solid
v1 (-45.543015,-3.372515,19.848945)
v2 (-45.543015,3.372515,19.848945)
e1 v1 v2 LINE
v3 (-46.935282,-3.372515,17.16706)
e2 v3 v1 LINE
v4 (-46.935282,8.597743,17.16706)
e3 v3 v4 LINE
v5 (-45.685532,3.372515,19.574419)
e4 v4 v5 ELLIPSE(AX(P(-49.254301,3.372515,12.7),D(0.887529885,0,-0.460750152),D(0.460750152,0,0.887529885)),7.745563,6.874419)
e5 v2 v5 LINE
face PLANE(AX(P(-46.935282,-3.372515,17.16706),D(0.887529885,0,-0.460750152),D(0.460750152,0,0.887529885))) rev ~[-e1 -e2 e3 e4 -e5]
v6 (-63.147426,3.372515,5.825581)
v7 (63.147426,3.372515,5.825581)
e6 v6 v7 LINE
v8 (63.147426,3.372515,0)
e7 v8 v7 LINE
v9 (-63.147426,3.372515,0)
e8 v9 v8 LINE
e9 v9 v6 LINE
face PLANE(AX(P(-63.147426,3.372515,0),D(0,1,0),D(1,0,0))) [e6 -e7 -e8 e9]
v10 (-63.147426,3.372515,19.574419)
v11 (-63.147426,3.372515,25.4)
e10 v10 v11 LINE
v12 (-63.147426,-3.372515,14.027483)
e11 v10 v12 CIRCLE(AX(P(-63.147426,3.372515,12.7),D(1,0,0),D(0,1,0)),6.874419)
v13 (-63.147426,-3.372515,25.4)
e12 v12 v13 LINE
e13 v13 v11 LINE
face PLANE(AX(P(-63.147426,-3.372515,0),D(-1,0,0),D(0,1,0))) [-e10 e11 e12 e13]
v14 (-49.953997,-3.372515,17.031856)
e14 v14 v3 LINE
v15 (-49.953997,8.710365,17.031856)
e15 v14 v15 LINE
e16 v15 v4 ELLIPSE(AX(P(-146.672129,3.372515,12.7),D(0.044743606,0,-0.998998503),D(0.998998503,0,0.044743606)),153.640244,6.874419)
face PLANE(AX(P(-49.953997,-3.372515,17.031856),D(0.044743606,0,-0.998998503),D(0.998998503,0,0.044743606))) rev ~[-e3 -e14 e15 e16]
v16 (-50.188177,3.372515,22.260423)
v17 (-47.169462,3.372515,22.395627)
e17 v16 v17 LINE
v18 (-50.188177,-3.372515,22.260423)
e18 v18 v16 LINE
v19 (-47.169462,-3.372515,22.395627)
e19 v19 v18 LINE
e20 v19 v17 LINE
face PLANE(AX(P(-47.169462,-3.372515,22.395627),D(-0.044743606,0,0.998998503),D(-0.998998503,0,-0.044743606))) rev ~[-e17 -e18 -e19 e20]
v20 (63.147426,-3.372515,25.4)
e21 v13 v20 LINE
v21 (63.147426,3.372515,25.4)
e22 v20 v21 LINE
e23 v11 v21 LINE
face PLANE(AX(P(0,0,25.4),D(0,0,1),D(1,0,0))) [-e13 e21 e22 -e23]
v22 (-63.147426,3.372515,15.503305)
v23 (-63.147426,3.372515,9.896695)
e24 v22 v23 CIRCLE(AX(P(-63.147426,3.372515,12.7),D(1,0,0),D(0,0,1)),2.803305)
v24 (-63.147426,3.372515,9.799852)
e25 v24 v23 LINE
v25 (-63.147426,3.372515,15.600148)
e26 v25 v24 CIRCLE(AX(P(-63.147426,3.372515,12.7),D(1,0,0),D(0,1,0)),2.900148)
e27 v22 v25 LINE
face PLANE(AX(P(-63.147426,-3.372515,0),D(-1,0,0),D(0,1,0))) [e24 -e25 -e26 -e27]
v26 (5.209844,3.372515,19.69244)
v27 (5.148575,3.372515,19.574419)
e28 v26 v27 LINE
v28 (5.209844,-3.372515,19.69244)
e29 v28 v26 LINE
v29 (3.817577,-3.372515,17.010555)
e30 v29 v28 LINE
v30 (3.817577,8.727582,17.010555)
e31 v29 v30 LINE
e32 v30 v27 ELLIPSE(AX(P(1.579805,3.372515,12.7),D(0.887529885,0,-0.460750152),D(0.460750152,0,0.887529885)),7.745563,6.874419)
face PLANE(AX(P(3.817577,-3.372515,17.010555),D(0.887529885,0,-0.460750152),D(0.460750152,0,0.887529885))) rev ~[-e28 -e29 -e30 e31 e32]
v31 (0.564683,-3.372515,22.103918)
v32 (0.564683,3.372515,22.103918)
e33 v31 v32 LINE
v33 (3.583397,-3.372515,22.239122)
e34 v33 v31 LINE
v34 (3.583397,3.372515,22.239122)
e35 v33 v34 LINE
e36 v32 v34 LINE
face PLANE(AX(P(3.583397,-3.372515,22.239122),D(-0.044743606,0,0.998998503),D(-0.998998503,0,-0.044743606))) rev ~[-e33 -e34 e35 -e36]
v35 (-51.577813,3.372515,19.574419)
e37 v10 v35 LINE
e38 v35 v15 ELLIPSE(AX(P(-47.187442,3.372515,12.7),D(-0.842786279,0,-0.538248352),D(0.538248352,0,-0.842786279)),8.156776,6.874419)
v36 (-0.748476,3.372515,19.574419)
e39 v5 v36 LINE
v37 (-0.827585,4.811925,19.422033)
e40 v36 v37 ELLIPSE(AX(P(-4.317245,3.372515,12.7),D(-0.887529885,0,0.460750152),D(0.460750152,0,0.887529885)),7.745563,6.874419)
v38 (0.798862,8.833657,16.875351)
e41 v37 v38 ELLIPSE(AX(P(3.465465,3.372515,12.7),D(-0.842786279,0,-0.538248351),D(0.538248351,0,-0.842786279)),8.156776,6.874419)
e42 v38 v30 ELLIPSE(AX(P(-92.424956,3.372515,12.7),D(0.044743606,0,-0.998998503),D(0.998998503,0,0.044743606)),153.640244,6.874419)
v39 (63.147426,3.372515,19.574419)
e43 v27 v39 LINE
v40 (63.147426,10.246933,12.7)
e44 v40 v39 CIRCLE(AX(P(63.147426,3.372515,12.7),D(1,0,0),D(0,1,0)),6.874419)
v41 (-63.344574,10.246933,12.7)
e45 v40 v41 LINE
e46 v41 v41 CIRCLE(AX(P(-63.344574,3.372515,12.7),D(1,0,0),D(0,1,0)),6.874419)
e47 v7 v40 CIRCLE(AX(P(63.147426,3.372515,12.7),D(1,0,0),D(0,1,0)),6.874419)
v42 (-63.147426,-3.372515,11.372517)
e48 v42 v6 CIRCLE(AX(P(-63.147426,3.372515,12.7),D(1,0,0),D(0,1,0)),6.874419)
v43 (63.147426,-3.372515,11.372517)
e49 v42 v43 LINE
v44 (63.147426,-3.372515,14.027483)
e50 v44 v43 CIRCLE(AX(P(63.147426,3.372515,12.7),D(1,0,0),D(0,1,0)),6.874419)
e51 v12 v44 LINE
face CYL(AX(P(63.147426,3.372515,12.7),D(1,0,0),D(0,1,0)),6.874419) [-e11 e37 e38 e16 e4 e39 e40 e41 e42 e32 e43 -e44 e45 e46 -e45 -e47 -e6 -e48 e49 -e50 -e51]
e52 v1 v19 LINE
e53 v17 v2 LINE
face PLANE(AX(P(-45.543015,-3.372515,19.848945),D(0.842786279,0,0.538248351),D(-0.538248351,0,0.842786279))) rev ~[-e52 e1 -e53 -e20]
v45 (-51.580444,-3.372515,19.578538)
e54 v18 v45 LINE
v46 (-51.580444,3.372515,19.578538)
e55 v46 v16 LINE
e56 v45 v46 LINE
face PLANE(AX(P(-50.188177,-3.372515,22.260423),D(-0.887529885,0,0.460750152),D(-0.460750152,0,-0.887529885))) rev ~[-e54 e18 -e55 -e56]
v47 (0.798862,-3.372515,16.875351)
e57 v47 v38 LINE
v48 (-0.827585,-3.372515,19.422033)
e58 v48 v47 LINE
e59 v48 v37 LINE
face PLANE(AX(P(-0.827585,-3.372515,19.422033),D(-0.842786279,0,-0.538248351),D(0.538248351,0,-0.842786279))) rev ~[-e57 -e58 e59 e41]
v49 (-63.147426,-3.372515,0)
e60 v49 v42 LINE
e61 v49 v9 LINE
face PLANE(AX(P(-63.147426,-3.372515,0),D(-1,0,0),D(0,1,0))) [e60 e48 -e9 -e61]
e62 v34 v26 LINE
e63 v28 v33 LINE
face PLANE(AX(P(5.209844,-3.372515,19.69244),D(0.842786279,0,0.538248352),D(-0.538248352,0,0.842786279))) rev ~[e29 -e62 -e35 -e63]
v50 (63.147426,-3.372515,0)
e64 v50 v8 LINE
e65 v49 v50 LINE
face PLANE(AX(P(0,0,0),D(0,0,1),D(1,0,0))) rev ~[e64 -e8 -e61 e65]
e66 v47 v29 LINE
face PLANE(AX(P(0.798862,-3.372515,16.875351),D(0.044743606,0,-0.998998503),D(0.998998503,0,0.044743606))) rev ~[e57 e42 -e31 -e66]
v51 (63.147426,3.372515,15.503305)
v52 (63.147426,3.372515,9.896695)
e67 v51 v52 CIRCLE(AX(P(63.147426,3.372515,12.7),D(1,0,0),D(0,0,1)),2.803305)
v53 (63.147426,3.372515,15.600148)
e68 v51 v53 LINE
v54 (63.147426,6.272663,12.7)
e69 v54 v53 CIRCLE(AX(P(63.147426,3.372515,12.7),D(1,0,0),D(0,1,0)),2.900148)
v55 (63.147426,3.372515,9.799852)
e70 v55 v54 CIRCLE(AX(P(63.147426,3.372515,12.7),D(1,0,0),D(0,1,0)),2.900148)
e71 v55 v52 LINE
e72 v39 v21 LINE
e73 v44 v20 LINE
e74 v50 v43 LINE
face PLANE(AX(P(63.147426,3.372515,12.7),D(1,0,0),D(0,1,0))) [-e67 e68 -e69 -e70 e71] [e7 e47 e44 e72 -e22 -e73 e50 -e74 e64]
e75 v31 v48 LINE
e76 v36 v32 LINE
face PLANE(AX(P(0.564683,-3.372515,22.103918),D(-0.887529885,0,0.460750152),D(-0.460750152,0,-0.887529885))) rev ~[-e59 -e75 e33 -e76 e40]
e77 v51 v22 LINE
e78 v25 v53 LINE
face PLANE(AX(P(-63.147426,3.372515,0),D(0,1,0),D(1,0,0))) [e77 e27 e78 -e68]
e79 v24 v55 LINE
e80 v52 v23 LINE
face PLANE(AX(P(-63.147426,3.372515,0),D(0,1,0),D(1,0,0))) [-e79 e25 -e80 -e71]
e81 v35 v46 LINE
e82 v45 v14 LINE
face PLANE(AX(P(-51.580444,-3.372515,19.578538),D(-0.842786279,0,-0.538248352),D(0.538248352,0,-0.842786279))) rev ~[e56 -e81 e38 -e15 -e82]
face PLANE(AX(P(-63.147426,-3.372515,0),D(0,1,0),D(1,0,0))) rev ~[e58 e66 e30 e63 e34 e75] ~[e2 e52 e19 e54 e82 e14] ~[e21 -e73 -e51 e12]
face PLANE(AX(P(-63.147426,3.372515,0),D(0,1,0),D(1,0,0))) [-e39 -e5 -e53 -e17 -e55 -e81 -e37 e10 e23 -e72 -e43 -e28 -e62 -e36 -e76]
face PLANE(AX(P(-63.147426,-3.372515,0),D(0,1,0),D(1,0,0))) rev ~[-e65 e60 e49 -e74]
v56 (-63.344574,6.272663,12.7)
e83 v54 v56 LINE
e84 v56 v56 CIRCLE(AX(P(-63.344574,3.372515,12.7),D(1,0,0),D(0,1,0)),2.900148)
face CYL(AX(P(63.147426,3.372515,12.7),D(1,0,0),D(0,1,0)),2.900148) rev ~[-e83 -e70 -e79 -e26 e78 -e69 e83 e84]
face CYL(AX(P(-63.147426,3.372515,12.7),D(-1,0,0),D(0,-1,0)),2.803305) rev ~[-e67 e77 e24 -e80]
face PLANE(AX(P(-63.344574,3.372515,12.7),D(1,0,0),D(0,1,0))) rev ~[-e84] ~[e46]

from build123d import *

# Parameters (mm, degrees)
F0_W      = 126.2948513031
F0_H      = 6.7450292408
F1_DEPTH  = 25.4
F4_R      = 2.8033052418
F5_DEPTH  = 127
F6_R      = 6.8744186216
F6_R_2    = 2.9001482236
F7_DEPTH  = 126.492
F9_DEPTH  = 12.7
F11_DEPTH = 12.7


# Not quite as in the source:
# - the program builds the solid bodies; features that only make, move or delete a surface that nothing else refers to are left out


with BuildPart() as f1:
    # F0 (on Top) → F1 (new body)
    with BuildSketch(Plane.XY):
        Rectangle(F0_W, F0_H)
    extrude(amount=F1_DEPTH)

    # F4 (on face) → F5 (cut)
    with BuildSketch(Plane(origin=(-63.1474256516, 0, 0), x_dir=(0, -1, 0), z_dir=(-1, 0, 0))):
        with Locations((-3.3725146204, 12.7)):
            Circle(F4_R)
    extrude(amount=-F5_DEPTH, mode=Mode.SUBTRACT)

    # F6 (on face) → F7 (join)
    with BuildSketch(Plane.YZ.offset(63.1474256516)):
        with Locations((3.3725146204, 12.7)):
            Circle(F6_R)
        with Locations((3.3725146204, 12.7)):
            Circle(F6_R_2, mode=Mode.SUBTRACT)
    extrude(amount=-F7_DEPTH)

    # F8 (on face) → F9 (cut)
    with BuildSketch(Plane.XZ.offset(3.3725146204)):
        Polygon((-45.5430149111, 19.8489452356), (-47.1694619385, 22.3956269569), (-50.1881765182, 22.2604233738), (-51.5804440704, 19.5785380695), (-49.953997043, 17.0318563483), (-46.9352824633, 17.1670599313), align=None)
    extrude(amount=-F9_DEPTH, mode=Mode.SUBTRACT)

    # F10 (on face) → F11 (cut)
    with BuildSketch(Plane.XZ.offset(3.3725146204)):
        Polygon((5.2098441705, 19.6924402974), (3.583397143, 22.2391220187), (0.5646825633, 22.1039184357), (-0.8275849889, 19.4220331314), (0.7988620385, 16.8753514101), (3.8175766182, 17.0105549931), align=None)
    extrude(amount=-F11_DEPTH, mode=Mode.SUBTRACT)


solid = f1.part
